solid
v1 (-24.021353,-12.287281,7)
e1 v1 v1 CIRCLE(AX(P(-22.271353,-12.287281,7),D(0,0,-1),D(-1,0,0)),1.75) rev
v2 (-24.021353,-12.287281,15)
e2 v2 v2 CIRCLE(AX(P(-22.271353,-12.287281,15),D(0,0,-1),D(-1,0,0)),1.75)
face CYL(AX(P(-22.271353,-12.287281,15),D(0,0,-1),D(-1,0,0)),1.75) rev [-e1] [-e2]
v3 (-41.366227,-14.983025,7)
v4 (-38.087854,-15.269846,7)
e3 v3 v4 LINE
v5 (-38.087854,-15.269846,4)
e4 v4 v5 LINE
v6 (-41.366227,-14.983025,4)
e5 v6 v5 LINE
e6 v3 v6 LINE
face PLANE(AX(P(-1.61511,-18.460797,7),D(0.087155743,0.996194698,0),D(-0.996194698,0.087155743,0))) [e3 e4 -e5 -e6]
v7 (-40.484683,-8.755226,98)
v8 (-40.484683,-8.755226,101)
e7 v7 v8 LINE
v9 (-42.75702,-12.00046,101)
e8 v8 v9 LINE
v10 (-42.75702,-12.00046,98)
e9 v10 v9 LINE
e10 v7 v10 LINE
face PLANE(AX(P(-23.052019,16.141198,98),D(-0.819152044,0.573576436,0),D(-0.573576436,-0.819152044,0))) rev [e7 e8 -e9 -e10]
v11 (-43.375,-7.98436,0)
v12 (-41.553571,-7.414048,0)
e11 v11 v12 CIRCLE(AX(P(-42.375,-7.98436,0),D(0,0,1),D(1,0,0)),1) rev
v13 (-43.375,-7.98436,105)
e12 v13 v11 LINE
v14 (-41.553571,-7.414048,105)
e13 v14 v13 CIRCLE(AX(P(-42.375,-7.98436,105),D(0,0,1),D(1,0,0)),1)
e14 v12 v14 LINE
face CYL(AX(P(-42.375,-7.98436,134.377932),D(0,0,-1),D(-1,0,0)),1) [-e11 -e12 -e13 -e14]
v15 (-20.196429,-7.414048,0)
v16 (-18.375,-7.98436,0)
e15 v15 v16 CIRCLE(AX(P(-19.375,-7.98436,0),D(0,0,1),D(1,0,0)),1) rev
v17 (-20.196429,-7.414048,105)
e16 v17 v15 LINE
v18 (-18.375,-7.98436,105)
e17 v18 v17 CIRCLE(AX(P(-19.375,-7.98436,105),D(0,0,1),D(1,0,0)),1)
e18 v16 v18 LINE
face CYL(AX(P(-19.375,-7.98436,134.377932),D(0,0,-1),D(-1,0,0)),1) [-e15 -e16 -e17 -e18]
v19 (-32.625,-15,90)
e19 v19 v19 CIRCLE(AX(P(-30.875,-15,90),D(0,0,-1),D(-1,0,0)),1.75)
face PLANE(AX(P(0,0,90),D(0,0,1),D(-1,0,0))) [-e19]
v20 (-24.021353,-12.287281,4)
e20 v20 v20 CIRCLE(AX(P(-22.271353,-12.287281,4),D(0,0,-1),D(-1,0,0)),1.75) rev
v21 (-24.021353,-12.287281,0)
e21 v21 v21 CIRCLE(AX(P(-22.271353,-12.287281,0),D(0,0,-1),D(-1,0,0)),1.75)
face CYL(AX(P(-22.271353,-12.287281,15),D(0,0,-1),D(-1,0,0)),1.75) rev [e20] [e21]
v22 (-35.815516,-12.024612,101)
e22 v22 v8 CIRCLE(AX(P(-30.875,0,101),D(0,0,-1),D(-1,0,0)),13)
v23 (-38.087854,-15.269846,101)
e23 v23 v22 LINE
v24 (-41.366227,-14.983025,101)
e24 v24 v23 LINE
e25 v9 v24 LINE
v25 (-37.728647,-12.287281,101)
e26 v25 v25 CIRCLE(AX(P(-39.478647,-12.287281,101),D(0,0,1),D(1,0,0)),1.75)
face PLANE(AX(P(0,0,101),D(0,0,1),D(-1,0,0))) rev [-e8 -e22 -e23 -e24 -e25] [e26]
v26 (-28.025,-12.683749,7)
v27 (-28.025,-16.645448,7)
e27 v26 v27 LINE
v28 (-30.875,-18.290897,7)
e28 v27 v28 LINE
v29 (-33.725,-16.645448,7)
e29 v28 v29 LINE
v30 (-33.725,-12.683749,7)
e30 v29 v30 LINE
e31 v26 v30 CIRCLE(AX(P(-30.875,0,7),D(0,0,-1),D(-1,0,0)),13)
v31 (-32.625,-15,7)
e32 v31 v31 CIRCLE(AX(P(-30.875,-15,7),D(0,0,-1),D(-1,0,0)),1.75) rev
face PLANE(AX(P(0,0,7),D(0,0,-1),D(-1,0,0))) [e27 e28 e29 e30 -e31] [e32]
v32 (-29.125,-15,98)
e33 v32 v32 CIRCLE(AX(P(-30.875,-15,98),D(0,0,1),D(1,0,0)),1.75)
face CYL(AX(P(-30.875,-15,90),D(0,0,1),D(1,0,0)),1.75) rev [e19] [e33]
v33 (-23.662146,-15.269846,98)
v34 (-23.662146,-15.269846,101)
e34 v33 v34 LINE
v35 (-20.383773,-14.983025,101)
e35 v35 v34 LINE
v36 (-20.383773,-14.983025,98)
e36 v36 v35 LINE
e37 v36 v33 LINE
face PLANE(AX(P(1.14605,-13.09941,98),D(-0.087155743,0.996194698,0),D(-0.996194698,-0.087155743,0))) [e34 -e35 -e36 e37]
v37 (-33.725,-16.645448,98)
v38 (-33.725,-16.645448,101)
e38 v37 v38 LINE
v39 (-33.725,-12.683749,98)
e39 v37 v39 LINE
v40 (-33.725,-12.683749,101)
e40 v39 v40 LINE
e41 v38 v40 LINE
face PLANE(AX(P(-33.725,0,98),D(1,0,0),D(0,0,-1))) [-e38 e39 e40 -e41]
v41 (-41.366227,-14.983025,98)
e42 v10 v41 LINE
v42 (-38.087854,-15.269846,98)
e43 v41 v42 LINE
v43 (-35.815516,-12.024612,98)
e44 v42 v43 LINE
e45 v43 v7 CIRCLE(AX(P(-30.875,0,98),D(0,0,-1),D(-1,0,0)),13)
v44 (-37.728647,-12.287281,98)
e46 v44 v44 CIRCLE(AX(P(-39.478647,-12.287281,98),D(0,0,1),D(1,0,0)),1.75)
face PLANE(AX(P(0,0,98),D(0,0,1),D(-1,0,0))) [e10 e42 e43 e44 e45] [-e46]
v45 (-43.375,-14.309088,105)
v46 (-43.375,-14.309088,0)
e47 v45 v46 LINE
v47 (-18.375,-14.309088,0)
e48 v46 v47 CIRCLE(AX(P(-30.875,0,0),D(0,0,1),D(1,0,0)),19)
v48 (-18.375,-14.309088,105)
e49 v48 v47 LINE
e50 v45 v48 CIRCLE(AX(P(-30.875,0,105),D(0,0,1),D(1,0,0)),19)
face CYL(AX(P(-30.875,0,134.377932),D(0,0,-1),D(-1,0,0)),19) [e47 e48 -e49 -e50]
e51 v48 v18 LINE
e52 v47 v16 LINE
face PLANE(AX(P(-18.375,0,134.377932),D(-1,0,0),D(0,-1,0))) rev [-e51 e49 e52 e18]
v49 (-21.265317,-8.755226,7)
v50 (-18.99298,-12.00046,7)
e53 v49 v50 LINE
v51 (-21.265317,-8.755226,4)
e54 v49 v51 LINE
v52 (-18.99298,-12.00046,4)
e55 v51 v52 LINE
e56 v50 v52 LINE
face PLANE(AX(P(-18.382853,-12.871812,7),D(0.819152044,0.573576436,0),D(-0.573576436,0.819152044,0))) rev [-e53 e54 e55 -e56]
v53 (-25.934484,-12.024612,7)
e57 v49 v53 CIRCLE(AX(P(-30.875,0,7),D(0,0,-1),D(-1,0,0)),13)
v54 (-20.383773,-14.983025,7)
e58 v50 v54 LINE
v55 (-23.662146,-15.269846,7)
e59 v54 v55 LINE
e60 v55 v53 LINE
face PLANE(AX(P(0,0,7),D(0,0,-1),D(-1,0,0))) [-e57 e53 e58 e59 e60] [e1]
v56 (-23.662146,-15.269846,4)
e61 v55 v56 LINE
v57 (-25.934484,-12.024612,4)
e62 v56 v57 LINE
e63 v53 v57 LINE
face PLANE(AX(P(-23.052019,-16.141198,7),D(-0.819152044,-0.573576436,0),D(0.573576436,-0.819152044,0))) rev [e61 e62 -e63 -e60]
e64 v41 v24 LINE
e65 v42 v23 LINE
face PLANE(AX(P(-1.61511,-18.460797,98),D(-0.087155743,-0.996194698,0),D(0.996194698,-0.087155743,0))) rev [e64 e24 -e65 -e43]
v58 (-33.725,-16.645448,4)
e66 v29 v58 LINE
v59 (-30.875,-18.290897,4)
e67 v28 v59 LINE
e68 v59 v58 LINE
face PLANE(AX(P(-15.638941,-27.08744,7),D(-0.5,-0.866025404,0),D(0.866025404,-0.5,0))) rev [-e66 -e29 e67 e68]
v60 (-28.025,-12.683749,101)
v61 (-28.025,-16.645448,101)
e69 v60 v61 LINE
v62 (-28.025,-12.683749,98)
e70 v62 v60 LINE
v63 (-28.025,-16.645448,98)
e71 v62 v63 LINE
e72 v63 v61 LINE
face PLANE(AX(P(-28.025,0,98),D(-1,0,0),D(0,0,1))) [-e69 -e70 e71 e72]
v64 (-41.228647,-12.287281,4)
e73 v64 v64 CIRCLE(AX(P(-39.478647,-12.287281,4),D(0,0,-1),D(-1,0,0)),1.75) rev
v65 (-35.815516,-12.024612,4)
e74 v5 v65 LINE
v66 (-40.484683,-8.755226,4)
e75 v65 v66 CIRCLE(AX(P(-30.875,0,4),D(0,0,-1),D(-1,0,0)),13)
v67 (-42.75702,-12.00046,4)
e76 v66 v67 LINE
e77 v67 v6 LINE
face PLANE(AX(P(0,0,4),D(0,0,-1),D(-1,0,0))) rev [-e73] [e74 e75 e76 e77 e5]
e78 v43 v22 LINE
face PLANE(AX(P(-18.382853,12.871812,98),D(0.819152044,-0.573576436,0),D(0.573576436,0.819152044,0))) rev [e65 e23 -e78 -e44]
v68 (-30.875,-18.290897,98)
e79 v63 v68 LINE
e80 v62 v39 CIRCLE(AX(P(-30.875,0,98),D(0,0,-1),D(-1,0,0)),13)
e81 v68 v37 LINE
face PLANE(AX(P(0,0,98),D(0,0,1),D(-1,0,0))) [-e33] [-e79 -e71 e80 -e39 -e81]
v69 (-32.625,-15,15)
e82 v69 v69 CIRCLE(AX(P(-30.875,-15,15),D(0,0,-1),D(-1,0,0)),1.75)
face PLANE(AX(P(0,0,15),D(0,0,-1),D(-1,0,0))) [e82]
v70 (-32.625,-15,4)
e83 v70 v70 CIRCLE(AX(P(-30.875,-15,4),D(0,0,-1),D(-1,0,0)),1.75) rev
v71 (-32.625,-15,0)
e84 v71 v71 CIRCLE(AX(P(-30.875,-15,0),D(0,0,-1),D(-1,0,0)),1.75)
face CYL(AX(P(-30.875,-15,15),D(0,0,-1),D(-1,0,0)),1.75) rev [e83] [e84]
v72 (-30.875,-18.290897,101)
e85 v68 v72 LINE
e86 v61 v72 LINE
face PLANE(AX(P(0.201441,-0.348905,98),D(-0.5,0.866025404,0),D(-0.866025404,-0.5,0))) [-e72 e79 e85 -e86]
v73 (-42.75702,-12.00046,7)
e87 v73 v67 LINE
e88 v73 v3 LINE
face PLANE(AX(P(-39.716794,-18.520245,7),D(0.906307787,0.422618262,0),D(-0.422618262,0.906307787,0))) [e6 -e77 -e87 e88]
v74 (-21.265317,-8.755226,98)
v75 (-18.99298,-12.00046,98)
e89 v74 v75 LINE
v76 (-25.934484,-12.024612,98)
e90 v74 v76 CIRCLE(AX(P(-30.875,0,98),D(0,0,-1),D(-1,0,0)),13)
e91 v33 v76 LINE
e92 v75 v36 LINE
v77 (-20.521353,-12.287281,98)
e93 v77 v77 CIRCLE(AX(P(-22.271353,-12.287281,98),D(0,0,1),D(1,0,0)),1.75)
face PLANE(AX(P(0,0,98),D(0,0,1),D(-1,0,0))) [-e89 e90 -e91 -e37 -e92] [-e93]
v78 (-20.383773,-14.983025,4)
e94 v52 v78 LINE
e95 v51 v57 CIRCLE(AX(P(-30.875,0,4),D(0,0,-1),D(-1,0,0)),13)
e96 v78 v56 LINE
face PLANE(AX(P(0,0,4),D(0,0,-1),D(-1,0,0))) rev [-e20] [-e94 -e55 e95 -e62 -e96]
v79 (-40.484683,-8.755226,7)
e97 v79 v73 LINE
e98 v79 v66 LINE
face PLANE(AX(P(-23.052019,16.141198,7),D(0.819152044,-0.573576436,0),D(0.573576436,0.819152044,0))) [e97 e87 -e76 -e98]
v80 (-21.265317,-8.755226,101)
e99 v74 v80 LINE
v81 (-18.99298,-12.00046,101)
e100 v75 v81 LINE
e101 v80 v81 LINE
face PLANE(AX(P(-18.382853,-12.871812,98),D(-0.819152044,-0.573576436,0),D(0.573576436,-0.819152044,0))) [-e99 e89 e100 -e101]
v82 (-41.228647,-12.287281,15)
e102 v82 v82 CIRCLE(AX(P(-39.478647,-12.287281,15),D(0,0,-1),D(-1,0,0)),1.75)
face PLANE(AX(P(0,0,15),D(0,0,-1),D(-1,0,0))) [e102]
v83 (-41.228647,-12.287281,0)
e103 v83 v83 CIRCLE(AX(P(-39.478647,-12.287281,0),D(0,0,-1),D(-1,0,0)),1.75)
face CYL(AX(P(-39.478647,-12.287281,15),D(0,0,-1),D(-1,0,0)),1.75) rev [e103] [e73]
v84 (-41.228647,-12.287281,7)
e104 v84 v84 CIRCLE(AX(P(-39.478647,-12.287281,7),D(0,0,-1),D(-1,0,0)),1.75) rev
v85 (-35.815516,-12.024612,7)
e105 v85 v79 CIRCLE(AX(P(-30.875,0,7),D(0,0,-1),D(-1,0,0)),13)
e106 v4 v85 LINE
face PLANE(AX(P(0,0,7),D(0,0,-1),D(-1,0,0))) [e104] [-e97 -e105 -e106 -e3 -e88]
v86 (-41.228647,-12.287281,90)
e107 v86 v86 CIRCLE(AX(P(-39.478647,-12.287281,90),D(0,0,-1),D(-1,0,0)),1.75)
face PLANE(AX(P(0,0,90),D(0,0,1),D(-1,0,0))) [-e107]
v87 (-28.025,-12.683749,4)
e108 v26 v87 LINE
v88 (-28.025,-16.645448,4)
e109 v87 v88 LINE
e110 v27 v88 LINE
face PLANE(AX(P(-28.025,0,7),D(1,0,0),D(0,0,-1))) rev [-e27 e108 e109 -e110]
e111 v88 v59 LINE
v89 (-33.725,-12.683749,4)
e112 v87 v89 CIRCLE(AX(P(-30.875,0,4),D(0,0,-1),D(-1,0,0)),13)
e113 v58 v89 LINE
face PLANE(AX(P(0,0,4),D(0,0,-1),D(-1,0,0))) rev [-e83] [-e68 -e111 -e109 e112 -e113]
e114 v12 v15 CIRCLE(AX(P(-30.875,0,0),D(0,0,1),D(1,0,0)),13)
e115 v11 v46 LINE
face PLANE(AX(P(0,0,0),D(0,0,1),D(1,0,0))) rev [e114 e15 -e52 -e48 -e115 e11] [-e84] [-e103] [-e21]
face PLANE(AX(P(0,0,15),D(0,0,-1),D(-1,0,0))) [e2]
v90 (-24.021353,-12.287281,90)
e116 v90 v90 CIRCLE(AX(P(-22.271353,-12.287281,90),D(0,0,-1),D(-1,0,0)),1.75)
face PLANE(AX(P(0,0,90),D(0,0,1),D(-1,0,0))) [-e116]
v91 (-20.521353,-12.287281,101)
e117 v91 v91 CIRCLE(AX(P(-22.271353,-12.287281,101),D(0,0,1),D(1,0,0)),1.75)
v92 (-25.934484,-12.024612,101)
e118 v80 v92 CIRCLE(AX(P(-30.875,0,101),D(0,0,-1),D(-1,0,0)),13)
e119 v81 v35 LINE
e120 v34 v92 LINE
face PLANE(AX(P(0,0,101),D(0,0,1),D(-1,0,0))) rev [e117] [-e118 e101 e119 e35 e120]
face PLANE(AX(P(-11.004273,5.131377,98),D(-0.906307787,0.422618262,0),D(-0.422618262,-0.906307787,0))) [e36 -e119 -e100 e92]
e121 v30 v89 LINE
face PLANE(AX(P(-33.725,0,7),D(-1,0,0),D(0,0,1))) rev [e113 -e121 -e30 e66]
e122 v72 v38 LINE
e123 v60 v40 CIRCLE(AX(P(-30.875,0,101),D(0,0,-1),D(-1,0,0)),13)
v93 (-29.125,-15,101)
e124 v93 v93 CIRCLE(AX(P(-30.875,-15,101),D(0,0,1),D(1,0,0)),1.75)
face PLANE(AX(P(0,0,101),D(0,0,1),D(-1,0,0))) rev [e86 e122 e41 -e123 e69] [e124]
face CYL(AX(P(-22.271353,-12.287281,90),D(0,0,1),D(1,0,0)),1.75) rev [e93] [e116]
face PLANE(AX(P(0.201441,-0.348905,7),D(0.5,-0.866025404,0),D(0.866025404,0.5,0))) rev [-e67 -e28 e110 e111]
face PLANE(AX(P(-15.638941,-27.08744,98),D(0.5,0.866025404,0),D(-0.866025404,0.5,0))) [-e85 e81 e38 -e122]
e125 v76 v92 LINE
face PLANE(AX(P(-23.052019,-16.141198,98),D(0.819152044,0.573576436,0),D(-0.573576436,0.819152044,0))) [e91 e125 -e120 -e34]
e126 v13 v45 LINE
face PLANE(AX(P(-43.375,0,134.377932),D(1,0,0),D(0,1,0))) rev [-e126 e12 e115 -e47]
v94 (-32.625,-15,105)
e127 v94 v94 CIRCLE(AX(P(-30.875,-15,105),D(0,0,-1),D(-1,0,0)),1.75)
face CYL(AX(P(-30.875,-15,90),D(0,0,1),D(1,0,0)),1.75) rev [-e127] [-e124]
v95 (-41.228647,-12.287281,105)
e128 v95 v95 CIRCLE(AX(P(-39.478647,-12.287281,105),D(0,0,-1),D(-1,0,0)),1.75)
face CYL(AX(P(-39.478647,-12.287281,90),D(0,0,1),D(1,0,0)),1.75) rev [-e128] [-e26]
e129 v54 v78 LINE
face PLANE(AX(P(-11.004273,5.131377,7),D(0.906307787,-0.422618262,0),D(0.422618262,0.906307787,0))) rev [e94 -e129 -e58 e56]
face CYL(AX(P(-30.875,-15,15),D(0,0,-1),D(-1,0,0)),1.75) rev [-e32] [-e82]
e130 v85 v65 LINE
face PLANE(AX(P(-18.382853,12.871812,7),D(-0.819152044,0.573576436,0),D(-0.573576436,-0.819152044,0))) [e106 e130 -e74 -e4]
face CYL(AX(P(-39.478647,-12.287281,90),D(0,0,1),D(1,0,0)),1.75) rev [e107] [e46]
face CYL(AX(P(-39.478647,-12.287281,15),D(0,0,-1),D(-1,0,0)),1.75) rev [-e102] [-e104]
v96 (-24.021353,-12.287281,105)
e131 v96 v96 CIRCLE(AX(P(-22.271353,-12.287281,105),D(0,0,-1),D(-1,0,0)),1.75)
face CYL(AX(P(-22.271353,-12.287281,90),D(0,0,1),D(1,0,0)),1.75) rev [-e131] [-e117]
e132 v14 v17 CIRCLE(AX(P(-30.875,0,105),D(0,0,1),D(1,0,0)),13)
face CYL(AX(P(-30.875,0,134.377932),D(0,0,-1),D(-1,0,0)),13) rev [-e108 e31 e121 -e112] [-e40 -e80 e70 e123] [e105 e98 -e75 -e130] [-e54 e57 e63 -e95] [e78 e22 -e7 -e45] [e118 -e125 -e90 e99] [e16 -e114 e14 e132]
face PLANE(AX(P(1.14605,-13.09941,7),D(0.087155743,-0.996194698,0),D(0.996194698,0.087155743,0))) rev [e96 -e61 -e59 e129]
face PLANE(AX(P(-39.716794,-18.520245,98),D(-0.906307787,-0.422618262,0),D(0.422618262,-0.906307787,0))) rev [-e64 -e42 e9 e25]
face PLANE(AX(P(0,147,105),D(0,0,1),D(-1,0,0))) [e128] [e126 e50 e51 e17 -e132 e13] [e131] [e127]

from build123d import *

# Parameters (mm, degrees)
BOSS_EXTRUDE1_DEPTH    = 105
SKETCH3_R              = 1.75
CUT_EXTRUDE1_DEPTH     = 15
CUT_EXTRUDE2_START     = -3
CUT_EXTRUDE2_OUTLINE_R = 1.75
CUT_EXTRUDE2_DEPTH     = 3
FILLET1_R              = 1


# Read off the part's stored shape, not the designer's step: Cut-Extrude2
with BuildPart() as part:
    # Sketch1 → Boss-Extrude1 (new body)
    with BuildSketch(Plane.XY):
        with BuildLine():
            ThreePointArc((-43.375, -14.309088021), (-30.875, -19), (-18.375, -14.309088021))
            Line((-18.375, -14.309088021), (-18.375, -3.570714214))
            ThreePointArc((-18.375, -3.570714214), (-30.875, -13), (-43.375, -3.570714214))
            Line((-43.375, -3.570714214), (-43.375, -14.309088021))
        make_face()
    extrude(amount=BOSS_EXTRUDE1_DEPTH)

    # Sketch3 → Cut-Extrude1 (cut)
    with BuildSketch(Plane(origin=(0, 0, 0), x_dir=(-1, 0, 0), z_dir=(0, 0, -1))):
        with Locations((22.271353455, -12.287280664)):
            Circle(SKETCH3_R)
        with Locations((30.875, -15)):
            Circle(SKETCH3_R)
        with Locations((39.478646545, -12.287280664)):
            Circle(SKETCH3_R)
    cut_extrude1 = extrude(amount=-CUT_EXTRUDE1_DEPTH, mode=Mode.SUBTRACT)

    # Cut-Extrude2 outline → Cut-Extrude2 (cut)
    # profile 1 of 3: a face of its own
    with BuildSketch(Plane(origin=(0, 0, 4), x_dir=(-1, 0, 0), z_dir=(0, 0, -1)).offset(CUT_EXTRUDE2_START)):
        with BuildLine():
            Line((20.383772748, -14.983025288), (23.662146428, -15.26984582))
            Line((23.662146428, -15.26984582), (25.93448352, -12.024612131))
            ThreePointArc((25.93448352, -12.024612131), (23.418506327, -10.648976576), (21.265316867, -8.755226444))
            Line((21.265316867, -8.755226444), (18.992979775, -12.000460133))
            Line((18.992979775, -12.000460133), (20.383772748, -14.983025288))
        make_face()
        with Locations((22.271353455, -12.287280664)):
            Circle(CUT_EXTRUDE2_OUTLINE_R, mode=Mode.SUBTRACT)
    # profile 2 of 3: a face of its own
    with BuildSketch(Plane(origin=(0, 0, 4), x_dir=(-1, 0, 0), z_dir=(0, 0, -1)).offset(CUT_EXTRUDE2_START)):
        with BuildLine():
            ThreePointArc((40.484683133, -8.755226444), (38.331493673, -10.648976576), (35.81551648, -12.024612131))
            Line((35.81551648, -12.024612131), (38.087853572, -15.26984582))
            Line((38.087853572, -15.26984582), (41.366227252, -14.983025288))
            Line((41.366227252, -14.983025288), (42.757020225, -12.000460133))
            Line((42.757020225, -12.000460133), (40.484683133, -8.755226444))
        make_face()
        with Locations((39.478646545, -12.287280664)):
            Circle(CUT_EXTRUDE2_OUTLINE_R, mode=Mode.SUBTRACT)
    # profile 3 of 3: a face of its own
    with BuildSketch(Plane(origin=(0, 0, 4), x_dir=(-1, 0, 0), z_dir=(0, 0, -1)).offset(CUT_EXTRUDE2_START)):
        with BuildLine():
            ThreePointArc((33.725, -12.683749446), (30.875, -13), (28.025, -12.683749446))
            Line((28.025, -12.683749446), (28.025, -16.645448267))
            Line((28.025, -16.645448267), (30.875, -18.290896534))
            Line((30.875, -18.290896534), (33.725, -16.645448267))
            Line((33.725, -16.645448267), (33.725, -12.683749446))
        make_face()
        with Locations((30.875, -15)):
            Circle(CUT_EXTRUDE2_OUTLINE_R, mode=Mode.SUBTRACT)
    cut_extrude2 = extrude(amount=CUT_EXTRUDE2_DEPTH, mode=Mode.SUBTRACT)

    # Mirror1: Cut-Extrude1, Cut-Extrude2 across plane
    add(cut_extrude1.mirror(Plane(origin=(0, 0, 52.5), x_dir=(1, 0, 0), z_dir=(0, 0, -1))), mode=Mode.SUBTRACT)
    add(cut_extrude2.mirror(Plane(origin=(0, 0, 52.5), x_dir=(1, 0, 0), z_dir=(0, 0, -1))), mode=Mode.SUBTRACT)

    # Fillet1
    fillet1_edges = [part.edges().sort_by_distance(p)[0] for p in [
        (-18.375, -3.570714214, 52.5),
        (-43.375, -3.570714214, 52.5),
    ]]
    fillet(fillet1_edges, radius=FILLET1_R)


solid = part.part
